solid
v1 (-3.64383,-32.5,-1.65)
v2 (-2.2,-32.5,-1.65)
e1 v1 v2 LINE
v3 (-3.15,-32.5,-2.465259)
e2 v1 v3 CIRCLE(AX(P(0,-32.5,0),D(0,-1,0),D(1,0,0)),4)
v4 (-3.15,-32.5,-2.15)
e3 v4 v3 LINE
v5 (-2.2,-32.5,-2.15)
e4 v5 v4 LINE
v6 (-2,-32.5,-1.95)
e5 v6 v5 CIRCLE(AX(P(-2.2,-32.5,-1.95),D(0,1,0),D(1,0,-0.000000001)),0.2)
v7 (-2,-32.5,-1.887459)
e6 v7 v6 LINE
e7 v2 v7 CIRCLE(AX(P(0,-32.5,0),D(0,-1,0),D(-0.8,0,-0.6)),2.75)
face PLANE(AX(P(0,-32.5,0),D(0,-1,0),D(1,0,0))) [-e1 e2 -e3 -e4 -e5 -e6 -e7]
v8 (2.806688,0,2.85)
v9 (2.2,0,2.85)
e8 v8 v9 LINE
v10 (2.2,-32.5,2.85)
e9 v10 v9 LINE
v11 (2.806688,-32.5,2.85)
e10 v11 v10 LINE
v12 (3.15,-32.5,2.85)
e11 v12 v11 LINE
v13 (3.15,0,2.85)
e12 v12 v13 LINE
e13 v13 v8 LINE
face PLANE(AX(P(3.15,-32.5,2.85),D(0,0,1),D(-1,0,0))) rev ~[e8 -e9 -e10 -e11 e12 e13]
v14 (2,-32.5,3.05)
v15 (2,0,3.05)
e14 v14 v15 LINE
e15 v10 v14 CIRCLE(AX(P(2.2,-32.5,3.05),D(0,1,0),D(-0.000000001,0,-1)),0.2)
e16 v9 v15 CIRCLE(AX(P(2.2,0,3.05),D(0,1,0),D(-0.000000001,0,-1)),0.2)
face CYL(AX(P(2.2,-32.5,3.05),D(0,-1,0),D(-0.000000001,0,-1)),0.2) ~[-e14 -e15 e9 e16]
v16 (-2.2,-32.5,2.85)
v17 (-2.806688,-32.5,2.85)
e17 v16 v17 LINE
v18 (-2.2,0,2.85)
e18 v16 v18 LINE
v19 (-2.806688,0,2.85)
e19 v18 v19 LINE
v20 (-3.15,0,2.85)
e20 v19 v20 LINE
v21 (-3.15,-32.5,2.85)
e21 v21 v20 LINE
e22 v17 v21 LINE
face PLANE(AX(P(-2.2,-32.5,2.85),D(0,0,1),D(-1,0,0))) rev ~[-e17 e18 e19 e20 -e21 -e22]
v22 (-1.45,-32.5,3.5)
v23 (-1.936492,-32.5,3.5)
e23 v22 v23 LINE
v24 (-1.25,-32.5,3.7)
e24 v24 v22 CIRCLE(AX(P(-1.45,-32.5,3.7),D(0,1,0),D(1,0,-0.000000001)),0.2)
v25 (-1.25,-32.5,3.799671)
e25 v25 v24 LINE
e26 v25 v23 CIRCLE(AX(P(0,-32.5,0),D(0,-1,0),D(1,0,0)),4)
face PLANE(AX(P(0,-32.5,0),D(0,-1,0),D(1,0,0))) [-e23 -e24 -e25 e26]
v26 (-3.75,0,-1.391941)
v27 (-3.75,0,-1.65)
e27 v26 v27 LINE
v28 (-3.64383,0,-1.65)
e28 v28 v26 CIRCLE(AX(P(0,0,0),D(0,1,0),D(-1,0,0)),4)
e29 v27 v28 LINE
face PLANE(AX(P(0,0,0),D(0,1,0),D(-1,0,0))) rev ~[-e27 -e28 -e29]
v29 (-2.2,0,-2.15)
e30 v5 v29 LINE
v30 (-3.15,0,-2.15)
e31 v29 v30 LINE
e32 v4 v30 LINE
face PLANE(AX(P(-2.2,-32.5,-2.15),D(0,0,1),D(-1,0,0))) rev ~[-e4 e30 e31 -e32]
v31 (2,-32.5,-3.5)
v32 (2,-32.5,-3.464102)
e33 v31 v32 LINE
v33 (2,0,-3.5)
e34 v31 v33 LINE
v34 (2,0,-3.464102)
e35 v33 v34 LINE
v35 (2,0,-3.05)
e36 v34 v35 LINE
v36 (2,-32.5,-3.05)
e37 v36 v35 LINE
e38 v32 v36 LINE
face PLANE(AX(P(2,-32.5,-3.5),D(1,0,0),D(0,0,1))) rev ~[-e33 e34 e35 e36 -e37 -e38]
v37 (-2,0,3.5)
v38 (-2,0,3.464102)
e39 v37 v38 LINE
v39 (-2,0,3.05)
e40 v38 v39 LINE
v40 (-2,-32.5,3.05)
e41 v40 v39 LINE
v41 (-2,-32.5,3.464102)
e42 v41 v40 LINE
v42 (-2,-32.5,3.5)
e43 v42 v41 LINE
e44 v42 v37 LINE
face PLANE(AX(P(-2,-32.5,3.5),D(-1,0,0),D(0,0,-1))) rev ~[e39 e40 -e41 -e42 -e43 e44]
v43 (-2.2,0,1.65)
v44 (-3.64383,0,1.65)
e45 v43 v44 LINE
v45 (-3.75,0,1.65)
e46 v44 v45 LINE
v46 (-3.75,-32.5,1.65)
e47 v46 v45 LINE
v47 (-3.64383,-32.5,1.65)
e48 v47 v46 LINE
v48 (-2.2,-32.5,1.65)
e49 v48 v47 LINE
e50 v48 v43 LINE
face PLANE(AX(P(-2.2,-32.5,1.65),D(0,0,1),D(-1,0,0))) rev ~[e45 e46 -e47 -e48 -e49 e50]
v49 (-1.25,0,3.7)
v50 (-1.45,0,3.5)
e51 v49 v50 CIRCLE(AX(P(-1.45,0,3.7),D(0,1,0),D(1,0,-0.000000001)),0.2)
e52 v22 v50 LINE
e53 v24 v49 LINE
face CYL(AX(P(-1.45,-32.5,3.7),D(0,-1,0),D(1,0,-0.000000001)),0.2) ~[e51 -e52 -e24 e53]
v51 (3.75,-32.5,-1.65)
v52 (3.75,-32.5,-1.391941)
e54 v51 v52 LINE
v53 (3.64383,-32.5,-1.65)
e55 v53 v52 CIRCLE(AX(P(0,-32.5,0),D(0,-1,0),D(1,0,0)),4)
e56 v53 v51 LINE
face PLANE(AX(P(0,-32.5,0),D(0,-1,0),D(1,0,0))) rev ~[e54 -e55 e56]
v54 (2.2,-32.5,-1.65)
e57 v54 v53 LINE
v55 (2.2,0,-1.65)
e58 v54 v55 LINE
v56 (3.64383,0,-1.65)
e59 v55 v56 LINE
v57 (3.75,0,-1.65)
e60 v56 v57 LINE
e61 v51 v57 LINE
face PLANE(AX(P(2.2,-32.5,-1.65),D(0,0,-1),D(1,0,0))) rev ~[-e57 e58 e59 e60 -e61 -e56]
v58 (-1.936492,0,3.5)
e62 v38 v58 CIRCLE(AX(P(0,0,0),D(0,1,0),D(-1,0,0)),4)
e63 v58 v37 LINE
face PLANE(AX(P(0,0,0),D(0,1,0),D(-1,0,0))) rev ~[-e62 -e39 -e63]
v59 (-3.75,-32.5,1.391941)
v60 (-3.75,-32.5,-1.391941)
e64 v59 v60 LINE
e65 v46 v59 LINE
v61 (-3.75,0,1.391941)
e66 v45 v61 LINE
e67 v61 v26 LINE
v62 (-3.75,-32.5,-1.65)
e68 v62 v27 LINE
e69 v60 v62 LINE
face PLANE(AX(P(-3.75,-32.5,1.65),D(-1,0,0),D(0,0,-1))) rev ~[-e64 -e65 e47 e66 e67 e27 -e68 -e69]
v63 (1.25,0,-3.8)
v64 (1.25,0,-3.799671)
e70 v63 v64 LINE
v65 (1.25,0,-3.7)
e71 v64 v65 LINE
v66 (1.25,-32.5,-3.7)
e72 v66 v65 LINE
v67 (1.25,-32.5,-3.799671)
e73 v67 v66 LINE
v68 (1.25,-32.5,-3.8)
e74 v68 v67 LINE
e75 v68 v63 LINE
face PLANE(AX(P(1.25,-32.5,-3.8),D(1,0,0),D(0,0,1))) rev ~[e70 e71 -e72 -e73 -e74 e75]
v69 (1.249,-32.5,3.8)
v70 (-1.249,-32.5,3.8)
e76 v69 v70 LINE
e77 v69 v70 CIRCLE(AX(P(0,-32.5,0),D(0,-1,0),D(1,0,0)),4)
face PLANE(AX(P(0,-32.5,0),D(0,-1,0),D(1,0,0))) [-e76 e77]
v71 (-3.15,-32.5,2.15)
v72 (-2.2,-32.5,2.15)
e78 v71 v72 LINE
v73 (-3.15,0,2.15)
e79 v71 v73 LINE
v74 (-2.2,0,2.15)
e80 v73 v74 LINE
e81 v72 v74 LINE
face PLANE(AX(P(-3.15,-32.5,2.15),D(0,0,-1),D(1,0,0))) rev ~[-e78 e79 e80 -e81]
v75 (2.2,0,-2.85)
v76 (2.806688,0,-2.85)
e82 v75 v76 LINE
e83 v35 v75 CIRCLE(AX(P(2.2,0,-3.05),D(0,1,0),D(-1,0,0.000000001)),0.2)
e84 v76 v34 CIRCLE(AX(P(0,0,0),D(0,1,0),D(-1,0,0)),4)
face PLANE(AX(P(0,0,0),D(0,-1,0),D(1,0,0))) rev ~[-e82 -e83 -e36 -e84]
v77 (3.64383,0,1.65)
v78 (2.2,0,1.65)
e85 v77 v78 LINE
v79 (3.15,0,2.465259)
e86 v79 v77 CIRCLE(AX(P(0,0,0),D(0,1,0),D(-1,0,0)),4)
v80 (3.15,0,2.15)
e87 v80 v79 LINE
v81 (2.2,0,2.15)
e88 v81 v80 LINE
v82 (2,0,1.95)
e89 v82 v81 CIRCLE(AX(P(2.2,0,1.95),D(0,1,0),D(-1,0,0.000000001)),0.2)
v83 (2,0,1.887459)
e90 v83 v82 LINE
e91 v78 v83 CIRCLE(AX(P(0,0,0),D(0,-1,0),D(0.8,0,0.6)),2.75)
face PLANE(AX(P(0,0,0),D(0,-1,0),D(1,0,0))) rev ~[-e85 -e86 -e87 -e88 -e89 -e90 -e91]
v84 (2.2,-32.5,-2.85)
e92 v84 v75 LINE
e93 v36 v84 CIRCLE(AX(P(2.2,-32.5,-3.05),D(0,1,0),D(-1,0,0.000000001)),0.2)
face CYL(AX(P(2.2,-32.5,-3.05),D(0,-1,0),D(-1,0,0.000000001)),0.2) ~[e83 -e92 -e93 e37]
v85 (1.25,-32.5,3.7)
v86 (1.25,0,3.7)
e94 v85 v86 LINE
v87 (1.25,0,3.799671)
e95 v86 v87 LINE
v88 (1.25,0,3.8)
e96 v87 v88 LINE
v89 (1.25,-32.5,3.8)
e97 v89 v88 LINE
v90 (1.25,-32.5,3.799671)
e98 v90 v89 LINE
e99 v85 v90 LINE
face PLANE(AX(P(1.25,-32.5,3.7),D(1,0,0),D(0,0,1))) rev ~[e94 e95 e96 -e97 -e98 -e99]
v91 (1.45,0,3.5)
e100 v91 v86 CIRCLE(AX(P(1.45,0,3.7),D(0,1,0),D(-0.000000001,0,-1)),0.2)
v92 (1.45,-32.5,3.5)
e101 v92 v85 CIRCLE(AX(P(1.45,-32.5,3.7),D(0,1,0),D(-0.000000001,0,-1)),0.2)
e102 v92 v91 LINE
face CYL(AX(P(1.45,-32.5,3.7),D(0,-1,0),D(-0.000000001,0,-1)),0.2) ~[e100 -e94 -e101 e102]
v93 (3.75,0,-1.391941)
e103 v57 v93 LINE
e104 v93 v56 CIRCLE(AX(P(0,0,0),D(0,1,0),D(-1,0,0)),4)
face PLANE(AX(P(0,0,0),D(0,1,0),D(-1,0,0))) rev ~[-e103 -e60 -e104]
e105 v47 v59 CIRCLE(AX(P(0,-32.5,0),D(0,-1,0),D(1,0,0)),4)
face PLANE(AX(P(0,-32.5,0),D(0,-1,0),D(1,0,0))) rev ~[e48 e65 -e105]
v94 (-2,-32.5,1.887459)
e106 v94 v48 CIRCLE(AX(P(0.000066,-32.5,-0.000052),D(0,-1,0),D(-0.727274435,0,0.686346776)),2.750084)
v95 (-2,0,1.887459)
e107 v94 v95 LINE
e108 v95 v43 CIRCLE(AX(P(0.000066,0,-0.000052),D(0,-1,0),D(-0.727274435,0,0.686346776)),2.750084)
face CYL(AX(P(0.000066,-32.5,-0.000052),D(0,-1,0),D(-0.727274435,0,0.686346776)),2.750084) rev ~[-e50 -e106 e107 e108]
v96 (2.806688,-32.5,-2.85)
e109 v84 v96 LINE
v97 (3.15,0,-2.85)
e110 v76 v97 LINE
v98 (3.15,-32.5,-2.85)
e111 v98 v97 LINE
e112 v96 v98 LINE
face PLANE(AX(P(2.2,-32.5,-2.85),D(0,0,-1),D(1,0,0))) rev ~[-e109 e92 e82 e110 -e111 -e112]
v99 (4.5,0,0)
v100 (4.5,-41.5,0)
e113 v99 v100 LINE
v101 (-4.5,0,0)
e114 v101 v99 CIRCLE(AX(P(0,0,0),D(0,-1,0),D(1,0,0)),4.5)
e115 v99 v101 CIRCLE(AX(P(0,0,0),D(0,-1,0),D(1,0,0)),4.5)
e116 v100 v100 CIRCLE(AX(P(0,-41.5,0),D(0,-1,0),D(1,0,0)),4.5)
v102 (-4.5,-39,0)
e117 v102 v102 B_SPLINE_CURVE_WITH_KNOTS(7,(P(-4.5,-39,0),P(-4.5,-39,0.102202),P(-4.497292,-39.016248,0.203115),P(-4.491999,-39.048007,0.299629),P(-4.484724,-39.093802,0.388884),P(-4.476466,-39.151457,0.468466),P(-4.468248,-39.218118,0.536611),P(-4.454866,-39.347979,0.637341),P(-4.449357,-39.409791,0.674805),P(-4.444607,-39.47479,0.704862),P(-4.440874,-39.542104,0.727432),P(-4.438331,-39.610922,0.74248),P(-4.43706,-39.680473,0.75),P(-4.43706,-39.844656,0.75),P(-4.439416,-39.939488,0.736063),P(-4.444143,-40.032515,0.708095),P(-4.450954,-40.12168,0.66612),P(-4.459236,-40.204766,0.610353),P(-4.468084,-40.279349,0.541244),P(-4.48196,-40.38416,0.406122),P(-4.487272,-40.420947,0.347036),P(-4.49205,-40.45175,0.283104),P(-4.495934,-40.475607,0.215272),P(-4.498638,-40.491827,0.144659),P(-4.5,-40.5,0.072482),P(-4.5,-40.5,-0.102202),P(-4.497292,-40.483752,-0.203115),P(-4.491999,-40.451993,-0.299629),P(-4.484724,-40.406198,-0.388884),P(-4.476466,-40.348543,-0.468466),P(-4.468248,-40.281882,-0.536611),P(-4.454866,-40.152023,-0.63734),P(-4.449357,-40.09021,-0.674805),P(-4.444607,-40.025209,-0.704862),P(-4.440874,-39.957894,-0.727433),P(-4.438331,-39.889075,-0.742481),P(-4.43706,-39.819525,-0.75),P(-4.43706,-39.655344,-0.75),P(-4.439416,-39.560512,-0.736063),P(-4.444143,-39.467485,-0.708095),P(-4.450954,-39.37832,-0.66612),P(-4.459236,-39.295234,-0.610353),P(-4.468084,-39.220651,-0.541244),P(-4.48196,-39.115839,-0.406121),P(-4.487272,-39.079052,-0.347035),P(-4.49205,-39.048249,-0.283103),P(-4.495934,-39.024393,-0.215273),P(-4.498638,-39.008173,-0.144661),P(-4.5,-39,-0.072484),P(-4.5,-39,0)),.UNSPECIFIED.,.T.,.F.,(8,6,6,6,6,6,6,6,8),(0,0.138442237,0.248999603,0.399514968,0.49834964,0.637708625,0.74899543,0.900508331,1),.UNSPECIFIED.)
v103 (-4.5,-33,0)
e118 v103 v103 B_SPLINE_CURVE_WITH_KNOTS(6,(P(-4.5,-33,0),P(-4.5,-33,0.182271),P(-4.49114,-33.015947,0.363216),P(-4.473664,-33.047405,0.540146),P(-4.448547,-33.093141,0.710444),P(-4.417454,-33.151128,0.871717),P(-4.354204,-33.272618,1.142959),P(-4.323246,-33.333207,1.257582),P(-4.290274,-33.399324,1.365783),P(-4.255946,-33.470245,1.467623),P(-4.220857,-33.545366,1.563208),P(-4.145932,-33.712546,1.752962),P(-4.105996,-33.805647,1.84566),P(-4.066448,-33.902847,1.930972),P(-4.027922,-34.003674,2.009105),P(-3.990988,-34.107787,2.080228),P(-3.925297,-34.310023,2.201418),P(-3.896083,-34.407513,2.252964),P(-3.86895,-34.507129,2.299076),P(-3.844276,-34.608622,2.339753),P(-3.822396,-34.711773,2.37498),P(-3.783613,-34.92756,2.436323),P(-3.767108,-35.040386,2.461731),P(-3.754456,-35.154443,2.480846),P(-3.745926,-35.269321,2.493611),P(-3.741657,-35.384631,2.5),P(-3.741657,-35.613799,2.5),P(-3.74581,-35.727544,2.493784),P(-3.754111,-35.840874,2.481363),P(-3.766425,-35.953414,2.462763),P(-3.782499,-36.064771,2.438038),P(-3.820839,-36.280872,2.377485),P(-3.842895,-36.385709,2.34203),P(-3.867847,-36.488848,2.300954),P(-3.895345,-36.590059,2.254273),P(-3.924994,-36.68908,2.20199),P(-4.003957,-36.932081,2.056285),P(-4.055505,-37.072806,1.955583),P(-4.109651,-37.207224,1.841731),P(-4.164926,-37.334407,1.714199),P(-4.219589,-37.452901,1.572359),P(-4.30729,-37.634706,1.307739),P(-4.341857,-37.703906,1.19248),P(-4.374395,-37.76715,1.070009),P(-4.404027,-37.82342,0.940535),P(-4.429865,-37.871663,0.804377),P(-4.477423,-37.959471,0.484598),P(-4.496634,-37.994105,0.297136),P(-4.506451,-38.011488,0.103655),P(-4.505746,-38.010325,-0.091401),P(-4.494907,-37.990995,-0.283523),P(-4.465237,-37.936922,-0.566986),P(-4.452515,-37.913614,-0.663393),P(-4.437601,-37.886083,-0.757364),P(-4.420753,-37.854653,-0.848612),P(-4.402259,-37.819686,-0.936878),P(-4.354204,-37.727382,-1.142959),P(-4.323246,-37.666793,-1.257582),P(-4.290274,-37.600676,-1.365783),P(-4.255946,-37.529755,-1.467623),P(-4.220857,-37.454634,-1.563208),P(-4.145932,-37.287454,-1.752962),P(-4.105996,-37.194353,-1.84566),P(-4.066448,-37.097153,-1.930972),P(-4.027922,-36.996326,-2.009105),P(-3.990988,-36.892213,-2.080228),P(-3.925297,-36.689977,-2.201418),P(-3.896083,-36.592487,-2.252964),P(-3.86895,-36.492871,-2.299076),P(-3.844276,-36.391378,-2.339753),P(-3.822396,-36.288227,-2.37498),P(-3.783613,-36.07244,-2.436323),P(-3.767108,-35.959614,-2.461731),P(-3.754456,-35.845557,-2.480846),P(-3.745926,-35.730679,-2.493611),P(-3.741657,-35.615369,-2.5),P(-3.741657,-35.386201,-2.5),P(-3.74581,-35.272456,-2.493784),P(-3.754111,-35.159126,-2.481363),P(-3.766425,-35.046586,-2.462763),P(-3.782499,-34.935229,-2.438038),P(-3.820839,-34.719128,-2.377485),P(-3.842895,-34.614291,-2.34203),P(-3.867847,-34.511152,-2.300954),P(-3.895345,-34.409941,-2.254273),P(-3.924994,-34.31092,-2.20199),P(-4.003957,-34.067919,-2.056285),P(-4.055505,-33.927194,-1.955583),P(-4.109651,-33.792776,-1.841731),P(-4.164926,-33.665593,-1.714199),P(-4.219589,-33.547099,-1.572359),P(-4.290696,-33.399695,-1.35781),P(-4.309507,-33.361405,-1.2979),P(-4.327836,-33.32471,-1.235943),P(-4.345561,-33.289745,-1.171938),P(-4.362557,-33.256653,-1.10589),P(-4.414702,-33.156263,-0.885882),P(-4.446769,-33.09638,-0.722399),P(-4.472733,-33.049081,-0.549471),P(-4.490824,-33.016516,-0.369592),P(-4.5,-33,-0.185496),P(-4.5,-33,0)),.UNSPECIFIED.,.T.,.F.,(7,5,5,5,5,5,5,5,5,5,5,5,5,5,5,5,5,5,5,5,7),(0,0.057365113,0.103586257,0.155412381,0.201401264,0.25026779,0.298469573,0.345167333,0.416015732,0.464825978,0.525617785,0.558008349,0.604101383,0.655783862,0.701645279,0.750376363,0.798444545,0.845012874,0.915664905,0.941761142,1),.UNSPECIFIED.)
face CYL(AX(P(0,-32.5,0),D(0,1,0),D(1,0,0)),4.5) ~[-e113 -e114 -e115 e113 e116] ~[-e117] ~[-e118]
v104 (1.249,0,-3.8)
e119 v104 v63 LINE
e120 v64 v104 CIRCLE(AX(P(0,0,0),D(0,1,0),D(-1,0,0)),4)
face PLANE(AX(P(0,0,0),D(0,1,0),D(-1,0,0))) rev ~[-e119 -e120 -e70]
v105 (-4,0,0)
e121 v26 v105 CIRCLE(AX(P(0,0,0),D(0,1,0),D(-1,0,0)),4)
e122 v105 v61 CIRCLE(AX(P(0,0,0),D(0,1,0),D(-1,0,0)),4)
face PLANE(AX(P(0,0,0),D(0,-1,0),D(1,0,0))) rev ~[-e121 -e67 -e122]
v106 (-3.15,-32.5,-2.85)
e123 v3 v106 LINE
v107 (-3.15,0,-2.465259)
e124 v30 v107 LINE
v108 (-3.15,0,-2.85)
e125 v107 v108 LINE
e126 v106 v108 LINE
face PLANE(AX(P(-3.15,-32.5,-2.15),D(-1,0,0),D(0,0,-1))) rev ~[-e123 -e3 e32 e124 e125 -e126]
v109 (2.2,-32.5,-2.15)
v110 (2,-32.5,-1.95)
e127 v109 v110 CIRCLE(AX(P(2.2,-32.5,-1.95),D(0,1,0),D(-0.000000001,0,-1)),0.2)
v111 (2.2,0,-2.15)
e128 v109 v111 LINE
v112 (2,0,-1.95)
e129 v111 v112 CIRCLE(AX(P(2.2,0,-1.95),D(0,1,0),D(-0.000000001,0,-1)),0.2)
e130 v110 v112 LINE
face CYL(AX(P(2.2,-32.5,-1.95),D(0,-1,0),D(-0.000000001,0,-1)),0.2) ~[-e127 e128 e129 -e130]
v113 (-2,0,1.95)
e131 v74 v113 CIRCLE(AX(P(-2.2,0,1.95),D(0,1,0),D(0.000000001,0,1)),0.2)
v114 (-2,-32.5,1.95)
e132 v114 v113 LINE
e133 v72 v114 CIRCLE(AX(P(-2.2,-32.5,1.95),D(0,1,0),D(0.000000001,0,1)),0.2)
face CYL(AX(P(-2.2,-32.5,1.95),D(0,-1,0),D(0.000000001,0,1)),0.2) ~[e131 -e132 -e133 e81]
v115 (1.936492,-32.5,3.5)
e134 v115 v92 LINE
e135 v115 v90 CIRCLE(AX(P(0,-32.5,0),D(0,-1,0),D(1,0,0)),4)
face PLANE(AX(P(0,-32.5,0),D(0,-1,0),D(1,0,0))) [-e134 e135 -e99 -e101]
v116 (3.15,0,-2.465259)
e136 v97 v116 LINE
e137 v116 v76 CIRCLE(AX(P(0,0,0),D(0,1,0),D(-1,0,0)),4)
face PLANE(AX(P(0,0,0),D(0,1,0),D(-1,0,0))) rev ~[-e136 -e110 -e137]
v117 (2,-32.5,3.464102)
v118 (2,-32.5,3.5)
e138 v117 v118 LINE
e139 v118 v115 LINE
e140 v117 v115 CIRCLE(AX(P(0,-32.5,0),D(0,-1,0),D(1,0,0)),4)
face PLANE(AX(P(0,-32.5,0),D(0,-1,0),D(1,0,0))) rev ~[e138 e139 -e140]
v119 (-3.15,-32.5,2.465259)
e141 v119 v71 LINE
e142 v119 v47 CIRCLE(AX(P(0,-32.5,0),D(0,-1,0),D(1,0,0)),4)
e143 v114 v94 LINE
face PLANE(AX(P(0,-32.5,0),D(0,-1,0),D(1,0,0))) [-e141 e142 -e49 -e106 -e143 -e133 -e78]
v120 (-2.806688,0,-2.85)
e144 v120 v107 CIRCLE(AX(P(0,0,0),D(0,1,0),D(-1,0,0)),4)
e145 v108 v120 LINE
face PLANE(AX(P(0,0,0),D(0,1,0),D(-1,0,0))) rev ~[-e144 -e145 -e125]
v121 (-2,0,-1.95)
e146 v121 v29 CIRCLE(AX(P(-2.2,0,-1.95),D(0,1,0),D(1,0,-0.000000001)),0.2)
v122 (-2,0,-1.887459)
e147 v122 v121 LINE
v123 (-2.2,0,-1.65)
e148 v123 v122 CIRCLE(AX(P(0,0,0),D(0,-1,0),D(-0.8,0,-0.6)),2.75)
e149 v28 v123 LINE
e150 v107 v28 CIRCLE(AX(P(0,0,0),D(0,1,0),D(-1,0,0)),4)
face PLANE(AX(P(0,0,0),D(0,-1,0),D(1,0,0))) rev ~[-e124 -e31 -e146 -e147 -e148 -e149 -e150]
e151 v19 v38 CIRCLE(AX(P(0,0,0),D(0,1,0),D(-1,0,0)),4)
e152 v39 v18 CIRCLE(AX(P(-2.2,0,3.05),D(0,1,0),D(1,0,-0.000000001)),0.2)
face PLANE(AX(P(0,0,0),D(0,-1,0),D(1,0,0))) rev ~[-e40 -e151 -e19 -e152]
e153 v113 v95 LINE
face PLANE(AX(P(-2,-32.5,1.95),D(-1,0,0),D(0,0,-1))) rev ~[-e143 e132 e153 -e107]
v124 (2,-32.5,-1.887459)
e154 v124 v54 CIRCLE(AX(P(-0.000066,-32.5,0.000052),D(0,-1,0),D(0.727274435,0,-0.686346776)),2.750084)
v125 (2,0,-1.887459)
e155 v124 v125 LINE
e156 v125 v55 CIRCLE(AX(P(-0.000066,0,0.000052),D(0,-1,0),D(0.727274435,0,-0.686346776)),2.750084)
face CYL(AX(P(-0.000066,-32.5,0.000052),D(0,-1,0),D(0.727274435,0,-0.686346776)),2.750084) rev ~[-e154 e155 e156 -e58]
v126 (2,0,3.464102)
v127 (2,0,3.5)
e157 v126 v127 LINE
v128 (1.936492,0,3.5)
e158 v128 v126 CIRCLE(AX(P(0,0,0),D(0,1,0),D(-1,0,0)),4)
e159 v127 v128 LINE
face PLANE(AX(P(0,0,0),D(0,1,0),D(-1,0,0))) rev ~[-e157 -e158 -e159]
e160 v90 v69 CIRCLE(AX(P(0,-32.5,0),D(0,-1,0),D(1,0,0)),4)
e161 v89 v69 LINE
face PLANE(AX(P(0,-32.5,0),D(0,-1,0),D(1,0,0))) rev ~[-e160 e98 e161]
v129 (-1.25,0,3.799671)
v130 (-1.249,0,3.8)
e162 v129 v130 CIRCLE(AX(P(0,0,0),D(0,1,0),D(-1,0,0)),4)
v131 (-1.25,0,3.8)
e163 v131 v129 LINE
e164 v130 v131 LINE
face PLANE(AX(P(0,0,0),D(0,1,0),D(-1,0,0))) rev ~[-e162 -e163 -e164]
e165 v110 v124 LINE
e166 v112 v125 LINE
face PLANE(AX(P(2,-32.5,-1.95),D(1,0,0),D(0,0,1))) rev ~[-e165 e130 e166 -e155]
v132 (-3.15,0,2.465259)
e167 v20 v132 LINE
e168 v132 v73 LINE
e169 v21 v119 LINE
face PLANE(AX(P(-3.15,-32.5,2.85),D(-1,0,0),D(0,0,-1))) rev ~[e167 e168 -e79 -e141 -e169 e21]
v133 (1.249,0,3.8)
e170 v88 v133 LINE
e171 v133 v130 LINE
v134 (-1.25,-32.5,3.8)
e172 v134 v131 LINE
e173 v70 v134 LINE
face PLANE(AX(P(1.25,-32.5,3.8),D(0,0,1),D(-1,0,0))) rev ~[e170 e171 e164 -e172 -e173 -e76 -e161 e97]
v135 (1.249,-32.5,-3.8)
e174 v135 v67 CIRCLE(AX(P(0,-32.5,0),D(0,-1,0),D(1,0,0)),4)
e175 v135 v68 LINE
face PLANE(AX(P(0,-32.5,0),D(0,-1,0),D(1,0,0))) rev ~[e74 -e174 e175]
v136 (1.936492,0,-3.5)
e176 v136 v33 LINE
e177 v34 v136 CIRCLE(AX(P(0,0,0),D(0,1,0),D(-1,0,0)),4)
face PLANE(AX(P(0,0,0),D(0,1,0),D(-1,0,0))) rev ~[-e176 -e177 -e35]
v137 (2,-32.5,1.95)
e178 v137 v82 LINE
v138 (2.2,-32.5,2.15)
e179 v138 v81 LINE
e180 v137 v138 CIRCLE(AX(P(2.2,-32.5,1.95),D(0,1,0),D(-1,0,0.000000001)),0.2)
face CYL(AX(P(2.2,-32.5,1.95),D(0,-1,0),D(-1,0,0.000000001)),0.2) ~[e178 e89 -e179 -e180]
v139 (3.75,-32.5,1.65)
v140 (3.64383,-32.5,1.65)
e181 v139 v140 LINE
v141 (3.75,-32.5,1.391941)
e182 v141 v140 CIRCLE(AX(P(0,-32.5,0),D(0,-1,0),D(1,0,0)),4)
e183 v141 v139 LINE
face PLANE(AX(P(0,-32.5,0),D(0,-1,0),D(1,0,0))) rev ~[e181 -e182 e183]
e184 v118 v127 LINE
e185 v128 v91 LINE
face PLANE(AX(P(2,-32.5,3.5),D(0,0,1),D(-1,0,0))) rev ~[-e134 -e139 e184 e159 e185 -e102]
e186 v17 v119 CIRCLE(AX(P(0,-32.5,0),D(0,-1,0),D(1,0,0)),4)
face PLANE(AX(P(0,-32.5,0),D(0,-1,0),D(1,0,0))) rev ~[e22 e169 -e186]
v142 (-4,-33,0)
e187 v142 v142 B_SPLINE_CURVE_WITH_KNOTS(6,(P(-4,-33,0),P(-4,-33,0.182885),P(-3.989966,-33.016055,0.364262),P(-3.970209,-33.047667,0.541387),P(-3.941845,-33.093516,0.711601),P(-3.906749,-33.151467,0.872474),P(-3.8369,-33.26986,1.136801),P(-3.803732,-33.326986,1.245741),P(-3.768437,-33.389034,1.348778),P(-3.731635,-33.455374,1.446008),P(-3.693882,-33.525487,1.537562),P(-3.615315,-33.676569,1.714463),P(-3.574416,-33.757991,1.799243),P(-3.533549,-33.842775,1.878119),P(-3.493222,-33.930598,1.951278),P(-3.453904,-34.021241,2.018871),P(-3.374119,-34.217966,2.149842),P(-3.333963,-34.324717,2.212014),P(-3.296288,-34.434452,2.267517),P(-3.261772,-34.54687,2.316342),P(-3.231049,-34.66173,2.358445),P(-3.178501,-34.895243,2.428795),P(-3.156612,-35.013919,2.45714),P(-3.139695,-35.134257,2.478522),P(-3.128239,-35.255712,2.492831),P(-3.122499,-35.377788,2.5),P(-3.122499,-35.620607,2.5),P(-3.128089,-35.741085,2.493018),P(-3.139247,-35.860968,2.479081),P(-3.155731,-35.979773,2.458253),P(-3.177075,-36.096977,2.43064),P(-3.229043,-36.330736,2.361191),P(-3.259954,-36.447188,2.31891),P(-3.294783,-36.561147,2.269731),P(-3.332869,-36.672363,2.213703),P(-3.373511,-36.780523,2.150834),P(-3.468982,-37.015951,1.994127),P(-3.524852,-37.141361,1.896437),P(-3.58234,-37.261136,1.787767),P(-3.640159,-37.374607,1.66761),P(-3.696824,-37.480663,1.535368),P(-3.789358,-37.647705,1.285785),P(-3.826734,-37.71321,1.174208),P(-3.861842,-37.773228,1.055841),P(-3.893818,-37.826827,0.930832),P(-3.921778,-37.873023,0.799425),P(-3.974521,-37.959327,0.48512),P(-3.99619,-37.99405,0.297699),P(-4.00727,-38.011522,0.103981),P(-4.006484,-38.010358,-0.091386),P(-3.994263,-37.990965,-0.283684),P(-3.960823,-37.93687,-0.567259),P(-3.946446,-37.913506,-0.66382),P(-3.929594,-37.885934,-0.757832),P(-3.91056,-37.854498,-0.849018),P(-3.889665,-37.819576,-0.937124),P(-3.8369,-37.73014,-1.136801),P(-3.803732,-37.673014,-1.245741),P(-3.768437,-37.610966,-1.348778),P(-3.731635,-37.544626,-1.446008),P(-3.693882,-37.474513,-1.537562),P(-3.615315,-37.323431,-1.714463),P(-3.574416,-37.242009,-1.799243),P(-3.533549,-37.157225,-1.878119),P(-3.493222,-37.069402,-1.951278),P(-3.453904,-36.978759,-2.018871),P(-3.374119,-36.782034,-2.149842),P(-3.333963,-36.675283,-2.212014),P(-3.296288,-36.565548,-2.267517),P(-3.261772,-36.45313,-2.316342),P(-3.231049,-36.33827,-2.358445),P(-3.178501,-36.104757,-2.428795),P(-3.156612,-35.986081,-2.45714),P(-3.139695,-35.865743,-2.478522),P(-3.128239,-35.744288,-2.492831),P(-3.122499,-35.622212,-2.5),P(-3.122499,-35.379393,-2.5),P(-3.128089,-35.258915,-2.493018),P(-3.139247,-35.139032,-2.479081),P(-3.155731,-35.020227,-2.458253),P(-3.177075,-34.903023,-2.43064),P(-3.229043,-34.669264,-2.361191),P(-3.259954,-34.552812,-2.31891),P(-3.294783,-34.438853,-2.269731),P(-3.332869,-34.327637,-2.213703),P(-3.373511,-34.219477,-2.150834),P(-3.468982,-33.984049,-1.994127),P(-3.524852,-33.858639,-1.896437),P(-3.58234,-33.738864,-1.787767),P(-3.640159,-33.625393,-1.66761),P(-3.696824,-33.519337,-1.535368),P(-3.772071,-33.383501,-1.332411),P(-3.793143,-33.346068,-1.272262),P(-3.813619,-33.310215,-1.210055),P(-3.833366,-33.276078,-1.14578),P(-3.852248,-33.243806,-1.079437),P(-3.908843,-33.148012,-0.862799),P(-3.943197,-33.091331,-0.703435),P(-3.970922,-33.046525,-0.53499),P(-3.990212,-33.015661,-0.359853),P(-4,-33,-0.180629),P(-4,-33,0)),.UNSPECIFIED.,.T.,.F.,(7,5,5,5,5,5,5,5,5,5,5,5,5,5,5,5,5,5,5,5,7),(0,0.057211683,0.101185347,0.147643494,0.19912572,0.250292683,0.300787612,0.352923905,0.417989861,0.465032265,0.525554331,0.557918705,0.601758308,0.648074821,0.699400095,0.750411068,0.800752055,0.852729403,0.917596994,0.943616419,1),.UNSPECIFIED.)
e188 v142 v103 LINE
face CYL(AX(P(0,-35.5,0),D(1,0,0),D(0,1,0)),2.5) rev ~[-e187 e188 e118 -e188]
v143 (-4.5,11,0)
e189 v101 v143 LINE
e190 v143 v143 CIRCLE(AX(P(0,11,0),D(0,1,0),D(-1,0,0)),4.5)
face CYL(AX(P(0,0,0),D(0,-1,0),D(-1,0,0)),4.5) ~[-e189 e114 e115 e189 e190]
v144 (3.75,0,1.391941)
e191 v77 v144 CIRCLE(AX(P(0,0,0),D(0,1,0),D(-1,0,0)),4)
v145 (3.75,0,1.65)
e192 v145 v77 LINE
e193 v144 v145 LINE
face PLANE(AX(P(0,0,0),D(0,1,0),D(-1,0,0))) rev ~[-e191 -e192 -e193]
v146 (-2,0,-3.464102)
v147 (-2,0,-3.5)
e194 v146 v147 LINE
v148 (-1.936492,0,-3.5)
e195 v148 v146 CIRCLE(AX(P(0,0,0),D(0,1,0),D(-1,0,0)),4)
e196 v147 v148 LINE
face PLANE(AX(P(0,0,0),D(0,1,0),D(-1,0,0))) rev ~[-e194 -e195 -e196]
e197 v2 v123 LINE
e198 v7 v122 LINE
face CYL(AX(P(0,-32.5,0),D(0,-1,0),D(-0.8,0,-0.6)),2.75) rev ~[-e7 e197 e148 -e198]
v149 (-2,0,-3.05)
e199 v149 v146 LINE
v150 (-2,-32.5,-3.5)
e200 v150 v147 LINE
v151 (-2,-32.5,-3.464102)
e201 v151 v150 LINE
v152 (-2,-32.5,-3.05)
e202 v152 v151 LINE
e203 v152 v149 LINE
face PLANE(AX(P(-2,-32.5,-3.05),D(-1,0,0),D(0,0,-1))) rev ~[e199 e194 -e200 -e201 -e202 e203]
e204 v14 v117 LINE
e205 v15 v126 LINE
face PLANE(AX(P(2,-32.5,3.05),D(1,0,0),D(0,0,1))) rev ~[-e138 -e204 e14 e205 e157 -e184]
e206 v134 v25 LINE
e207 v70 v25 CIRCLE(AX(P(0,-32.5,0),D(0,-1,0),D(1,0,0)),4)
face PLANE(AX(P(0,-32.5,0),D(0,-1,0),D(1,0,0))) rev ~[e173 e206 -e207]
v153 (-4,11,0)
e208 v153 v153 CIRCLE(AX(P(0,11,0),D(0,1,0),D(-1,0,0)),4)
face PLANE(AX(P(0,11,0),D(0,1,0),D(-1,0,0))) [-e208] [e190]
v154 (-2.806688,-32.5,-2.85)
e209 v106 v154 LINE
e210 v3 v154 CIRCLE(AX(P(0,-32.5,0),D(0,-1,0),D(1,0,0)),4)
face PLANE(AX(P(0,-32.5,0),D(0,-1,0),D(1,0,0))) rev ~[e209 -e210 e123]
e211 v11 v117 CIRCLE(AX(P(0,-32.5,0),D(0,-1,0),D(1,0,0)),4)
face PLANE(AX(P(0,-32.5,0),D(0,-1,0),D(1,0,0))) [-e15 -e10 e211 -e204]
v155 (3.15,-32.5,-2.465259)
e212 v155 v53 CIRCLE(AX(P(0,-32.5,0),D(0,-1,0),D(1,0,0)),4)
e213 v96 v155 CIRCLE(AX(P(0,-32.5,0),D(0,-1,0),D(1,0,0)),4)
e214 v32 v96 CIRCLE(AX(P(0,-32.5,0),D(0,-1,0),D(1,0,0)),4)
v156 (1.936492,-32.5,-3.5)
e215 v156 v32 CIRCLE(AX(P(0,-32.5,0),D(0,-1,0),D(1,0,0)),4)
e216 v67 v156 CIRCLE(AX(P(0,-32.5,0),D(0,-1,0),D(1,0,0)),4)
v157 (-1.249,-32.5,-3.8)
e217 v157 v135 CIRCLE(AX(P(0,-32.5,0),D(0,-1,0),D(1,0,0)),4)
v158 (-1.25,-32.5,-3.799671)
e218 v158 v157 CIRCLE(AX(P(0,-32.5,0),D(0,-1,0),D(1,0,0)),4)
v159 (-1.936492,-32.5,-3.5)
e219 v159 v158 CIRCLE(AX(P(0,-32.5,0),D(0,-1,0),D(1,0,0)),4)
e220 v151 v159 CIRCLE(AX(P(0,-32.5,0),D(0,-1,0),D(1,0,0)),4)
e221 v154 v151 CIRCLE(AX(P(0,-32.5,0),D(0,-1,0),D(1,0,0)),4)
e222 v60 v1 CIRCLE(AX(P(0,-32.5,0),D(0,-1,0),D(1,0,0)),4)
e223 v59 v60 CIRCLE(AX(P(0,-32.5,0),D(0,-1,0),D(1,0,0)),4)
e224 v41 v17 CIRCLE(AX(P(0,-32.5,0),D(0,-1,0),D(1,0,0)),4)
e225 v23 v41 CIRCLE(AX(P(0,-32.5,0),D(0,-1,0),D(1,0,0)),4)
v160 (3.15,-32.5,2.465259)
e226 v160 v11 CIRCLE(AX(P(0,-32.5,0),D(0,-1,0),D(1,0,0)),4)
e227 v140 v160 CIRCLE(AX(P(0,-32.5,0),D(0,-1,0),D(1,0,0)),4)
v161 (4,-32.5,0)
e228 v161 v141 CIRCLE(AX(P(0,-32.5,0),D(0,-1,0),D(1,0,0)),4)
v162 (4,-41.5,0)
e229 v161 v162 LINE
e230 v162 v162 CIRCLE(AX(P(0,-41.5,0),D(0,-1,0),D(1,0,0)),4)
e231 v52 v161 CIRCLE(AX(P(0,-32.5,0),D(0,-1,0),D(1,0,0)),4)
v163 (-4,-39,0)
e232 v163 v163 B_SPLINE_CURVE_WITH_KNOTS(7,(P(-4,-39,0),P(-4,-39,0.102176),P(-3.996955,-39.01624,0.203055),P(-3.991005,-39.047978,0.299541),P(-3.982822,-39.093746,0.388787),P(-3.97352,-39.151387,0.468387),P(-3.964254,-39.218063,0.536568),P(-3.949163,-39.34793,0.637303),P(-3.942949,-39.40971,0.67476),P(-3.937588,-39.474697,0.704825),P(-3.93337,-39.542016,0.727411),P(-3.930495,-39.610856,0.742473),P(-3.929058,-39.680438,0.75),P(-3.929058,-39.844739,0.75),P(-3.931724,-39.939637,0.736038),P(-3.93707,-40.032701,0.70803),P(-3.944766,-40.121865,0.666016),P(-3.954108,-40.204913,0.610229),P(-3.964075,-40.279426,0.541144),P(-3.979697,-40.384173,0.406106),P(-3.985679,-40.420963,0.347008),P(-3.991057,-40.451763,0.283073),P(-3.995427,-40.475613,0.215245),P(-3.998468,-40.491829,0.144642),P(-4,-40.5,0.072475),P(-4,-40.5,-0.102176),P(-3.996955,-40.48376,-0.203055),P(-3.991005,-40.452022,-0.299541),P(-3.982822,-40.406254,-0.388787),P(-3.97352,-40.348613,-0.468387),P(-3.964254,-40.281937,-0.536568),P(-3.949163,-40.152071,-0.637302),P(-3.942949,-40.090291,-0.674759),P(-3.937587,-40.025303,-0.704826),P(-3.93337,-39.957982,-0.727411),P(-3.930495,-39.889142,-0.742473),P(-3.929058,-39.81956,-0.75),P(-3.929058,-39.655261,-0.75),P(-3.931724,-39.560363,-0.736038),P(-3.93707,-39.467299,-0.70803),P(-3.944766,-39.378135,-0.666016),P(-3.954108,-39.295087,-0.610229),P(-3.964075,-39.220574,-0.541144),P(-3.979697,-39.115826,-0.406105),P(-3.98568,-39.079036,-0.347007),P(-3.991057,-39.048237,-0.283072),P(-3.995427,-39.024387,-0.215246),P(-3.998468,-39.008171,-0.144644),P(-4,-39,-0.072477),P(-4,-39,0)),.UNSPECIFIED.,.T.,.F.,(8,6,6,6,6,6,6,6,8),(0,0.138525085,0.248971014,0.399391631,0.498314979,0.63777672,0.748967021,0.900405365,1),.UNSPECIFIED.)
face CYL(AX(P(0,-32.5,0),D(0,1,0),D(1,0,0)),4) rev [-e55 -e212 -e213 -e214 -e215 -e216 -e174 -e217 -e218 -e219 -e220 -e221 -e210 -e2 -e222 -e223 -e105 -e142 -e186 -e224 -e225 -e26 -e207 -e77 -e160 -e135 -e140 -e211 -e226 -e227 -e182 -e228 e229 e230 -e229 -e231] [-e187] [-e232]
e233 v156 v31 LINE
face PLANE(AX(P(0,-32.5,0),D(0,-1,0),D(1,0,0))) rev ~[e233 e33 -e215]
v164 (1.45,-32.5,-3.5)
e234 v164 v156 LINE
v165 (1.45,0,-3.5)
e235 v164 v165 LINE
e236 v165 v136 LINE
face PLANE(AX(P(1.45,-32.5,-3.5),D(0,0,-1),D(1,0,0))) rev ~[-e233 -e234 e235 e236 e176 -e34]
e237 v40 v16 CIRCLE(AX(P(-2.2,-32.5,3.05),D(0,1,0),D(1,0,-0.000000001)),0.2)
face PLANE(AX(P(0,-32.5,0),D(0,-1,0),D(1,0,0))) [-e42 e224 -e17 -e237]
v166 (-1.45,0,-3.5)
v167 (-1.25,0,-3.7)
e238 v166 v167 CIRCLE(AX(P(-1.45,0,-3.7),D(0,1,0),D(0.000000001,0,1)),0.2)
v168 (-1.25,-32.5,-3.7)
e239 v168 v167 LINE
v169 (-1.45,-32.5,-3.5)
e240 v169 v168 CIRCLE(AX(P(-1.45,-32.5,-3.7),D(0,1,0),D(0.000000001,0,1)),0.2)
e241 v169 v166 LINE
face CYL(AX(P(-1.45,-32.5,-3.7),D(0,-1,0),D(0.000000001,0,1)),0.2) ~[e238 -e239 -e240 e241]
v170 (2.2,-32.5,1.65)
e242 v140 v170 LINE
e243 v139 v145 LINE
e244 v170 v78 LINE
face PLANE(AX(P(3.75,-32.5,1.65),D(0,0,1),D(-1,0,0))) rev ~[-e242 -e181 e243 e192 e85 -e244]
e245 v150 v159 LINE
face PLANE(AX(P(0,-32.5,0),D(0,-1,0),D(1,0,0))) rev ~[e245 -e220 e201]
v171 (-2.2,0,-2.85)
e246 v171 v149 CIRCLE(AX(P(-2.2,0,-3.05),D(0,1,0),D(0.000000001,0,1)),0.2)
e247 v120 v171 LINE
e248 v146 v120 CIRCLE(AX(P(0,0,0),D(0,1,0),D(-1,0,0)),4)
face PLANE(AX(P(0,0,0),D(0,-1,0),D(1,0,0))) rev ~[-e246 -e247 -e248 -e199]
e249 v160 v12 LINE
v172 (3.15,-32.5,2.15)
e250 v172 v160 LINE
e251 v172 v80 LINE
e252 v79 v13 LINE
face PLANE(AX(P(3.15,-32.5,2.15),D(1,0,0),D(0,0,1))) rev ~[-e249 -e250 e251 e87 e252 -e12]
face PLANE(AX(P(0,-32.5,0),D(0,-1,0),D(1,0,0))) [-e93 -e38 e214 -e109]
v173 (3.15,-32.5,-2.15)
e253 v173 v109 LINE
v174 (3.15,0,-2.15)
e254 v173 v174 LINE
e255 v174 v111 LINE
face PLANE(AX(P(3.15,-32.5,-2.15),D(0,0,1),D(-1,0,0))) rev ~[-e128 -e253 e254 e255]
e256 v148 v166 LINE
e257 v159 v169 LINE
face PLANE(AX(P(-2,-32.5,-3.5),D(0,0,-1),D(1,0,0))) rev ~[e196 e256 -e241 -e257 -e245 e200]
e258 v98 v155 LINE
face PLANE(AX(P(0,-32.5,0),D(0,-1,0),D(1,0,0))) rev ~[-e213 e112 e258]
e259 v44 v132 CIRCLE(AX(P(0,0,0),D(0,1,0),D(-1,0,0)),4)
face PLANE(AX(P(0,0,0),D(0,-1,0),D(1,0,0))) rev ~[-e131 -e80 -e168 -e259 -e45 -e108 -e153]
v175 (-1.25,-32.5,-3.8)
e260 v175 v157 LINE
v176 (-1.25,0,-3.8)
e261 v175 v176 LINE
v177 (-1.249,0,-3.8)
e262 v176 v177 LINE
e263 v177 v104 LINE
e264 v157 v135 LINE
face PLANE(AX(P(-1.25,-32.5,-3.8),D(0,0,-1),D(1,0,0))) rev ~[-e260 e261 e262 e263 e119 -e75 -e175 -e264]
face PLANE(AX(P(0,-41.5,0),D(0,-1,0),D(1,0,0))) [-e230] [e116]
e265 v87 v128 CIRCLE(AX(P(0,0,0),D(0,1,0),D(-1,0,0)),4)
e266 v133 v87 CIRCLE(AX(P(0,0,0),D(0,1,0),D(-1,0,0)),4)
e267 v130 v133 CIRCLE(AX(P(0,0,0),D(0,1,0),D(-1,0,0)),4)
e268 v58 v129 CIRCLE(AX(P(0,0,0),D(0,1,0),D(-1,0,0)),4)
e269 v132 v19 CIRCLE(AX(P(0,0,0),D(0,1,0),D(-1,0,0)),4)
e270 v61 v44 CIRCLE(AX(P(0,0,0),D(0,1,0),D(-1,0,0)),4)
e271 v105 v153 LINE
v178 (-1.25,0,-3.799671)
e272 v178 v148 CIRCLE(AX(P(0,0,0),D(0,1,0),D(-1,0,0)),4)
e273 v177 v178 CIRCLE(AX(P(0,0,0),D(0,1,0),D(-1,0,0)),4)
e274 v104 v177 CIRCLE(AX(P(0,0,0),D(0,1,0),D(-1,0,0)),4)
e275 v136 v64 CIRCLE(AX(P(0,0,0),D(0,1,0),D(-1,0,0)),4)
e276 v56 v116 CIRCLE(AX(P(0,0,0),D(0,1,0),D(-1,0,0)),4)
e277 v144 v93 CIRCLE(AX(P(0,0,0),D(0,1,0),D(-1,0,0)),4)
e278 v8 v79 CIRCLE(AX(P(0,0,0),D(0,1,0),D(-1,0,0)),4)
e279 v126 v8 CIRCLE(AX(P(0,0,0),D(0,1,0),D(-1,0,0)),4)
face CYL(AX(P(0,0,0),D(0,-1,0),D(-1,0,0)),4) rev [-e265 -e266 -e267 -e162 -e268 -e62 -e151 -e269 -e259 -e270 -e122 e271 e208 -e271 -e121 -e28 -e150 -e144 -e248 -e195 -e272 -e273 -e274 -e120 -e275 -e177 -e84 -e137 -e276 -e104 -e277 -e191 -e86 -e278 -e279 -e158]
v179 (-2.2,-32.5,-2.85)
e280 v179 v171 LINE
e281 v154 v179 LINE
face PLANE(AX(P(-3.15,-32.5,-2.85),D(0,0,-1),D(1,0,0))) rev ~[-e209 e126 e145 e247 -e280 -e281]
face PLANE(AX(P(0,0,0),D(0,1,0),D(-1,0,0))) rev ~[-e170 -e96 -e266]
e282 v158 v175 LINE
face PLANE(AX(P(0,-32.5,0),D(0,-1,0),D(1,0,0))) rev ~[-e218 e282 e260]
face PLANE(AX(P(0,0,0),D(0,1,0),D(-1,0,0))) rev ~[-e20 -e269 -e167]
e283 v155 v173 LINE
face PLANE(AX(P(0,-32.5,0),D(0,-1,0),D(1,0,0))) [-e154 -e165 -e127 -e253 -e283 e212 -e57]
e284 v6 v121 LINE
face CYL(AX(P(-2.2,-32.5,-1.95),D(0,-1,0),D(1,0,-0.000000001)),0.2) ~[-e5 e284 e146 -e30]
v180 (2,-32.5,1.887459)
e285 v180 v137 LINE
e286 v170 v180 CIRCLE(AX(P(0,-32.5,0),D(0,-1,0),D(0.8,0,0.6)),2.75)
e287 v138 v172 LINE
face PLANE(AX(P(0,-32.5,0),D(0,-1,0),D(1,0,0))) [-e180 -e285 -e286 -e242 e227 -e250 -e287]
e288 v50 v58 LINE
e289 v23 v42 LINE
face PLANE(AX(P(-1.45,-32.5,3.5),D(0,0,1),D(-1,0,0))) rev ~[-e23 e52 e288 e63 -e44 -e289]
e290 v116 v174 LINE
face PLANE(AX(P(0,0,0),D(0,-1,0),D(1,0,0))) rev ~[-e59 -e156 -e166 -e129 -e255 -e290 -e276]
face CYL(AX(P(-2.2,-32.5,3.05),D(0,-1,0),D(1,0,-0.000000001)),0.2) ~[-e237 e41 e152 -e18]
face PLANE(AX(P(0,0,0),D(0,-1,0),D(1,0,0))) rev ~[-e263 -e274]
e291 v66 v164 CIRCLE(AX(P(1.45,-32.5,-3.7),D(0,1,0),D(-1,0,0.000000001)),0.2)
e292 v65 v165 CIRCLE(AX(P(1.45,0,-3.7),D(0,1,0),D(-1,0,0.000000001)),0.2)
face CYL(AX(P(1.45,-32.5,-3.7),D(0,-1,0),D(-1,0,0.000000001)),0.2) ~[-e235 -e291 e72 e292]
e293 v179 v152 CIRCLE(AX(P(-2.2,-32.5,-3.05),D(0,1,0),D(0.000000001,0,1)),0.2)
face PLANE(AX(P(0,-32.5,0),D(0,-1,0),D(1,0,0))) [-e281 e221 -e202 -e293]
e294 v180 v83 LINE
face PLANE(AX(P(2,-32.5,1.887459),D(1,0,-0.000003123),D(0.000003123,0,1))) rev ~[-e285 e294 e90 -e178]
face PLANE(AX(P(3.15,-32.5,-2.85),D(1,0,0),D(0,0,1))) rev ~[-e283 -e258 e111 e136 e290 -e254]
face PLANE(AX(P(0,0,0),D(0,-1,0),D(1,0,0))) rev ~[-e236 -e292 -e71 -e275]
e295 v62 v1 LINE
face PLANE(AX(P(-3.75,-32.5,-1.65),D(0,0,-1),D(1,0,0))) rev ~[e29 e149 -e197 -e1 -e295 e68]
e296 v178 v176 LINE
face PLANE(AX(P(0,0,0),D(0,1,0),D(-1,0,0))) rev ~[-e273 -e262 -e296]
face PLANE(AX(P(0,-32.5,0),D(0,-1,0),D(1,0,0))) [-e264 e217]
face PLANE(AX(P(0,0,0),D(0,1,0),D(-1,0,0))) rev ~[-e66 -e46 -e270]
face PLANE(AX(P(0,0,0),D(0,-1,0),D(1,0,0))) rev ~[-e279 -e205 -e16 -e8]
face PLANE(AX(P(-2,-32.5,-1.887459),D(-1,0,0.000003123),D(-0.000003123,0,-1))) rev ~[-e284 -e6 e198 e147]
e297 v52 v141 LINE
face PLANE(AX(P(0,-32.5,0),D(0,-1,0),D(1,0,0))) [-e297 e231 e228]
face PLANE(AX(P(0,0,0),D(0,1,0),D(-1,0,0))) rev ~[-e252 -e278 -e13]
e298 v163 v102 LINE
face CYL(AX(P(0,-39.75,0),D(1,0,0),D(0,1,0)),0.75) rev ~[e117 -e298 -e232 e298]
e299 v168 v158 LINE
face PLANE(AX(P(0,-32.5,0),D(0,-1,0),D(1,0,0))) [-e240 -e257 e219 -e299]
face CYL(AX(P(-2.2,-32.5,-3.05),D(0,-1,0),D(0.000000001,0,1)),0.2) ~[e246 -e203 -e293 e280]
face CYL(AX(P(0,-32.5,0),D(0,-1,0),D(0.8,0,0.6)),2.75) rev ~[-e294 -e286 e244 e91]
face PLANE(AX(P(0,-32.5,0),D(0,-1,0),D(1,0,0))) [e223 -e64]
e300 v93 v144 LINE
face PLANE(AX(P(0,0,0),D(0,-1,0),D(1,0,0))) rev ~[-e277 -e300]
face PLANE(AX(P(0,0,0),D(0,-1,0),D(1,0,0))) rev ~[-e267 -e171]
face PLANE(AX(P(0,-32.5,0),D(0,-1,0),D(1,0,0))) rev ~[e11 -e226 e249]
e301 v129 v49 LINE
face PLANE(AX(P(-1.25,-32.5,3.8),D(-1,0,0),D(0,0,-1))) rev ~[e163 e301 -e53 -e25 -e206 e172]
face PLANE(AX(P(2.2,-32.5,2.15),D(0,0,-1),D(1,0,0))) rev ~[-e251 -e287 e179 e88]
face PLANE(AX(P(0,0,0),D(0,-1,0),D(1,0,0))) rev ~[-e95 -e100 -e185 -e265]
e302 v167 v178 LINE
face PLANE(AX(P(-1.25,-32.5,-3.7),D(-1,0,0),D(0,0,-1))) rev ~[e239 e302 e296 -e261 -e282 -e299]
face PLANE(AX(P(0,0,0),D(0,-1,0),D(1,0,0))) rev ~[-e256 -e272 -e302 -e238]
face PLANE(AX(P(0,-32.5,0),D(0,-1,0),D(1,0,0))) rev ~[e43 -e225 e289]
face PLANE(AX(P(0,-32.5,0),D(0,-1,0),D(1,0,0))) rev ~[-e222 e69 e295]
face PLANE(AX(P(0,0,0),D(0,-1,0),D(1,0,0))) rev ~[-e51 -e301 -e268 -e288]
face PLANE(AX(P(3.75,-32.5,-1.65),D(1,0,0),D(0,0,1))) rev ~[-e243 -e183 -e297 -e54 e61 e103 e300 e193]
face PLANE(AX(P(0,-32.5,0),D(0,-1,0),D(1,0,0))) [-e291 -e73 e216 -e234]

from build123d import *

# Parameters (mm, degrees)
F3_R      = 4.5
F4_DEPTH  = 32.5
F8_DEPTH  = 32.5
F6_R      = 4.5
F6_R_2    = 4
F9_DEPTH  = 9
F7_R      = 4.5
F7_R_2    = 4
F10_DEPTH = 11
F11_R     = 2.5
F11_R_2   = 0.75
F12_DEPTH = 4.501


# Not quite as in the source:
# - ends of sketch curves that miss each other by under 0.0002 mm in the source are joined


with BuildPart() as f4:
    # F3 (on Front) → F4 (new body)
    with BuildSketch(Plane.XZ):
        Circle(F3_R)
    extrude(amount=F4_DEPTH)

    # F5 (on face) → F8 (cut, through all)
    with BuildSketch(Plane.XZ.offset(32.5)):
        with BuildLine():
            Line((-1.25, -3.8), (0, -3.8))
            Line((0, -3.8), (1.25, -3.8))
            Line((1.25, -3.8), (1.25, -3.7))
            ThreePointArc((1.25, -3.7), (1.3085786438, -3.5585786438), (1.45, -3.5))
            Line((1.45, -3.5), (2, -3.5))
            Line((2, -3.5), (2, -3.05))
            ThreePointArc((2, -3.05), (2.0585786438, -2.9085786438), (2.2, -2.85))
            Line((2.2, -2.85), (3.15, -2.85))
            Line((3.15, -2.85), (3.15, -2.15))
            Line((3.15, -2.15), (2.2, -2.15))
            ThreePointArc((2.2, -2.15), (2.0585786438, -2.0914213562), (2, -1.95))
            Line((2, -1.95), (2, -1.887459))
            ThreePointArc((2, -1.887459), (2.1033535752, -1.771554046), (2.2, -1.65))
            Line((2.2, -1.65), (3.75, -1.65))
            Line((3.75, -1.65), (3.75, 0))
            Line((3.75, 0), (3.75, 1.65))
            Line((3.75, 1.65), (2.2, 1.65))
            ThreePointArc((2.2, 1.65), (2.1033535752, 1.771554046), (1.9999998047, 1.8874588157))
            Line((1.9999998047, 1.8874588157), (2, 1.95))
            ThreePointArc((2, 1.95), (2.0585786438, 2.0914213562), (2.2, 2.15))
            Line((2.2, 2.15), (3.15, 2.15))
            Line((3.15, 2.15), (3.15, 2.85))
            Line((3.15, 2.85), (2.2, 2.85))
            ThreePointArc((2.2, 2.85), (2.0585786438, 2.9085786438), (2, 3.05))
            Line((2, 3.05), (2, 3.5))
            Line((2, 3.5), (1.45, 3.5))
            ThreePointArc((1.45, 3.5), (1.3085786438, 3.5585786438), (1.25, 3.7))
            Line((1.25, 3.7), (1.25, 3.8))
            Line((1.25, 3.8), (0, 3.8))
            Line((0, 3.8), (-1.25, 3.8))
            Line((-1.25, 3.8), (-1.25, 3.7))
            ThreePointArc((-1.25, 3.7), (-1.3085786438, 3.5585786438), (-1.45, 3.5))
            Line((-1.45, 3.5), (-2, 3.5))
            Line((-2, 3.5), (-2, 3.05))
            ThreePointArc((-2, 3.05), (-2.0585786438, 2.9085786438), (-2.2, 2.85))
            Line((-2.2, 2.85), (-3.15, 2.85))
            Line((-3.15, 2.85), (-3.15, 2.15))
            Line((-3.15, 2.15), (-2.2, 2.15))
            ThreePointArc((-2.2, 2.15), (-2.0585786438, 2.0914213562), (-2, 1.95))
            Line((-2, 1.95), (-2, 1.887459))
            ThreePointArc((-2, 1.887459), (-2.1033535752, 1.771554046), (-2.2, 1.65))
            Line((-2.2, 1.65), (-3.75, 1.65))
            Line((-3.75, 1.65), (-3.75, 0))
            Line((-3.75, 0), (-3.75, -1.65))
            Line((-3.75, -1.65), (-2.2, -1.65))
            ThreePointArc((-2.2, -1.65), (-2.1033535752, -1.771554046), (-1.9999998047, -1.8874588157))
            Line((-1.9999998047, -1.8874588157), (-2, -1.95))
            ThreePointArc((-2, -1.95), (-2.0585786438, -2.0914213562), (-2.2, -2.15))
            Line((-2.2, -2.15), (-3.15, -2.15))
            Line((-3.15, -2.15), (-3.15, -2.85))
            Line((-3.15, -2.85), (-2.2, -2.85))
            ThreePointArc((-2.2, -2.85), (-2.0585786438, -2.9085786438), (-2, -3.05))
            Line((-2, -3.05), (-2, -3.5))
            Line((-2, -3.5), (-1.45, -3.5))
            ThreePointArc((-1.45, -3.5), (-1.3085786438, -3.5585786438), (-1.25, -3.7))
            Line((-1.25, -3.7), (-1.25, -3.8))
        make_face()
    extrude(amount=-F8_DEPTH, mode=Mode.SUBTRACT)

    # F6 (on face) → F9 (join)
    with BuildSketch(Plane.XZ.offset(32.5)):
        Circle(F6_R)
        Circle(F6_R_2, mode=Mode.SUBTRACT)
    extrude(amount=F9_DEPTH)

    # F7 (on face) → F10 (join)
    with BuildSketch(Plane(origin=(0, 0, 0), x_dir=(-1, 0, 0), z_dir=(0, 1, 0))):
        Circle(F7_R)
        Circle(F7_R_2, mode=Mode.SUBTRACT)
    extrude(amount=F10_DEPTH)

    # F11 (on Right) → F12 (cut, through all)
    with BuildSketch(Plane.YZ):
        with Locations((-35.5, 0)):
            Circle(F11_R)
        with Locations((-39.75, 0)):
            Circle(F11_R_2)
    extrude(amount=-F12_DEPTH, mode=Mode.SUBTRACT)


solid = f4.part
